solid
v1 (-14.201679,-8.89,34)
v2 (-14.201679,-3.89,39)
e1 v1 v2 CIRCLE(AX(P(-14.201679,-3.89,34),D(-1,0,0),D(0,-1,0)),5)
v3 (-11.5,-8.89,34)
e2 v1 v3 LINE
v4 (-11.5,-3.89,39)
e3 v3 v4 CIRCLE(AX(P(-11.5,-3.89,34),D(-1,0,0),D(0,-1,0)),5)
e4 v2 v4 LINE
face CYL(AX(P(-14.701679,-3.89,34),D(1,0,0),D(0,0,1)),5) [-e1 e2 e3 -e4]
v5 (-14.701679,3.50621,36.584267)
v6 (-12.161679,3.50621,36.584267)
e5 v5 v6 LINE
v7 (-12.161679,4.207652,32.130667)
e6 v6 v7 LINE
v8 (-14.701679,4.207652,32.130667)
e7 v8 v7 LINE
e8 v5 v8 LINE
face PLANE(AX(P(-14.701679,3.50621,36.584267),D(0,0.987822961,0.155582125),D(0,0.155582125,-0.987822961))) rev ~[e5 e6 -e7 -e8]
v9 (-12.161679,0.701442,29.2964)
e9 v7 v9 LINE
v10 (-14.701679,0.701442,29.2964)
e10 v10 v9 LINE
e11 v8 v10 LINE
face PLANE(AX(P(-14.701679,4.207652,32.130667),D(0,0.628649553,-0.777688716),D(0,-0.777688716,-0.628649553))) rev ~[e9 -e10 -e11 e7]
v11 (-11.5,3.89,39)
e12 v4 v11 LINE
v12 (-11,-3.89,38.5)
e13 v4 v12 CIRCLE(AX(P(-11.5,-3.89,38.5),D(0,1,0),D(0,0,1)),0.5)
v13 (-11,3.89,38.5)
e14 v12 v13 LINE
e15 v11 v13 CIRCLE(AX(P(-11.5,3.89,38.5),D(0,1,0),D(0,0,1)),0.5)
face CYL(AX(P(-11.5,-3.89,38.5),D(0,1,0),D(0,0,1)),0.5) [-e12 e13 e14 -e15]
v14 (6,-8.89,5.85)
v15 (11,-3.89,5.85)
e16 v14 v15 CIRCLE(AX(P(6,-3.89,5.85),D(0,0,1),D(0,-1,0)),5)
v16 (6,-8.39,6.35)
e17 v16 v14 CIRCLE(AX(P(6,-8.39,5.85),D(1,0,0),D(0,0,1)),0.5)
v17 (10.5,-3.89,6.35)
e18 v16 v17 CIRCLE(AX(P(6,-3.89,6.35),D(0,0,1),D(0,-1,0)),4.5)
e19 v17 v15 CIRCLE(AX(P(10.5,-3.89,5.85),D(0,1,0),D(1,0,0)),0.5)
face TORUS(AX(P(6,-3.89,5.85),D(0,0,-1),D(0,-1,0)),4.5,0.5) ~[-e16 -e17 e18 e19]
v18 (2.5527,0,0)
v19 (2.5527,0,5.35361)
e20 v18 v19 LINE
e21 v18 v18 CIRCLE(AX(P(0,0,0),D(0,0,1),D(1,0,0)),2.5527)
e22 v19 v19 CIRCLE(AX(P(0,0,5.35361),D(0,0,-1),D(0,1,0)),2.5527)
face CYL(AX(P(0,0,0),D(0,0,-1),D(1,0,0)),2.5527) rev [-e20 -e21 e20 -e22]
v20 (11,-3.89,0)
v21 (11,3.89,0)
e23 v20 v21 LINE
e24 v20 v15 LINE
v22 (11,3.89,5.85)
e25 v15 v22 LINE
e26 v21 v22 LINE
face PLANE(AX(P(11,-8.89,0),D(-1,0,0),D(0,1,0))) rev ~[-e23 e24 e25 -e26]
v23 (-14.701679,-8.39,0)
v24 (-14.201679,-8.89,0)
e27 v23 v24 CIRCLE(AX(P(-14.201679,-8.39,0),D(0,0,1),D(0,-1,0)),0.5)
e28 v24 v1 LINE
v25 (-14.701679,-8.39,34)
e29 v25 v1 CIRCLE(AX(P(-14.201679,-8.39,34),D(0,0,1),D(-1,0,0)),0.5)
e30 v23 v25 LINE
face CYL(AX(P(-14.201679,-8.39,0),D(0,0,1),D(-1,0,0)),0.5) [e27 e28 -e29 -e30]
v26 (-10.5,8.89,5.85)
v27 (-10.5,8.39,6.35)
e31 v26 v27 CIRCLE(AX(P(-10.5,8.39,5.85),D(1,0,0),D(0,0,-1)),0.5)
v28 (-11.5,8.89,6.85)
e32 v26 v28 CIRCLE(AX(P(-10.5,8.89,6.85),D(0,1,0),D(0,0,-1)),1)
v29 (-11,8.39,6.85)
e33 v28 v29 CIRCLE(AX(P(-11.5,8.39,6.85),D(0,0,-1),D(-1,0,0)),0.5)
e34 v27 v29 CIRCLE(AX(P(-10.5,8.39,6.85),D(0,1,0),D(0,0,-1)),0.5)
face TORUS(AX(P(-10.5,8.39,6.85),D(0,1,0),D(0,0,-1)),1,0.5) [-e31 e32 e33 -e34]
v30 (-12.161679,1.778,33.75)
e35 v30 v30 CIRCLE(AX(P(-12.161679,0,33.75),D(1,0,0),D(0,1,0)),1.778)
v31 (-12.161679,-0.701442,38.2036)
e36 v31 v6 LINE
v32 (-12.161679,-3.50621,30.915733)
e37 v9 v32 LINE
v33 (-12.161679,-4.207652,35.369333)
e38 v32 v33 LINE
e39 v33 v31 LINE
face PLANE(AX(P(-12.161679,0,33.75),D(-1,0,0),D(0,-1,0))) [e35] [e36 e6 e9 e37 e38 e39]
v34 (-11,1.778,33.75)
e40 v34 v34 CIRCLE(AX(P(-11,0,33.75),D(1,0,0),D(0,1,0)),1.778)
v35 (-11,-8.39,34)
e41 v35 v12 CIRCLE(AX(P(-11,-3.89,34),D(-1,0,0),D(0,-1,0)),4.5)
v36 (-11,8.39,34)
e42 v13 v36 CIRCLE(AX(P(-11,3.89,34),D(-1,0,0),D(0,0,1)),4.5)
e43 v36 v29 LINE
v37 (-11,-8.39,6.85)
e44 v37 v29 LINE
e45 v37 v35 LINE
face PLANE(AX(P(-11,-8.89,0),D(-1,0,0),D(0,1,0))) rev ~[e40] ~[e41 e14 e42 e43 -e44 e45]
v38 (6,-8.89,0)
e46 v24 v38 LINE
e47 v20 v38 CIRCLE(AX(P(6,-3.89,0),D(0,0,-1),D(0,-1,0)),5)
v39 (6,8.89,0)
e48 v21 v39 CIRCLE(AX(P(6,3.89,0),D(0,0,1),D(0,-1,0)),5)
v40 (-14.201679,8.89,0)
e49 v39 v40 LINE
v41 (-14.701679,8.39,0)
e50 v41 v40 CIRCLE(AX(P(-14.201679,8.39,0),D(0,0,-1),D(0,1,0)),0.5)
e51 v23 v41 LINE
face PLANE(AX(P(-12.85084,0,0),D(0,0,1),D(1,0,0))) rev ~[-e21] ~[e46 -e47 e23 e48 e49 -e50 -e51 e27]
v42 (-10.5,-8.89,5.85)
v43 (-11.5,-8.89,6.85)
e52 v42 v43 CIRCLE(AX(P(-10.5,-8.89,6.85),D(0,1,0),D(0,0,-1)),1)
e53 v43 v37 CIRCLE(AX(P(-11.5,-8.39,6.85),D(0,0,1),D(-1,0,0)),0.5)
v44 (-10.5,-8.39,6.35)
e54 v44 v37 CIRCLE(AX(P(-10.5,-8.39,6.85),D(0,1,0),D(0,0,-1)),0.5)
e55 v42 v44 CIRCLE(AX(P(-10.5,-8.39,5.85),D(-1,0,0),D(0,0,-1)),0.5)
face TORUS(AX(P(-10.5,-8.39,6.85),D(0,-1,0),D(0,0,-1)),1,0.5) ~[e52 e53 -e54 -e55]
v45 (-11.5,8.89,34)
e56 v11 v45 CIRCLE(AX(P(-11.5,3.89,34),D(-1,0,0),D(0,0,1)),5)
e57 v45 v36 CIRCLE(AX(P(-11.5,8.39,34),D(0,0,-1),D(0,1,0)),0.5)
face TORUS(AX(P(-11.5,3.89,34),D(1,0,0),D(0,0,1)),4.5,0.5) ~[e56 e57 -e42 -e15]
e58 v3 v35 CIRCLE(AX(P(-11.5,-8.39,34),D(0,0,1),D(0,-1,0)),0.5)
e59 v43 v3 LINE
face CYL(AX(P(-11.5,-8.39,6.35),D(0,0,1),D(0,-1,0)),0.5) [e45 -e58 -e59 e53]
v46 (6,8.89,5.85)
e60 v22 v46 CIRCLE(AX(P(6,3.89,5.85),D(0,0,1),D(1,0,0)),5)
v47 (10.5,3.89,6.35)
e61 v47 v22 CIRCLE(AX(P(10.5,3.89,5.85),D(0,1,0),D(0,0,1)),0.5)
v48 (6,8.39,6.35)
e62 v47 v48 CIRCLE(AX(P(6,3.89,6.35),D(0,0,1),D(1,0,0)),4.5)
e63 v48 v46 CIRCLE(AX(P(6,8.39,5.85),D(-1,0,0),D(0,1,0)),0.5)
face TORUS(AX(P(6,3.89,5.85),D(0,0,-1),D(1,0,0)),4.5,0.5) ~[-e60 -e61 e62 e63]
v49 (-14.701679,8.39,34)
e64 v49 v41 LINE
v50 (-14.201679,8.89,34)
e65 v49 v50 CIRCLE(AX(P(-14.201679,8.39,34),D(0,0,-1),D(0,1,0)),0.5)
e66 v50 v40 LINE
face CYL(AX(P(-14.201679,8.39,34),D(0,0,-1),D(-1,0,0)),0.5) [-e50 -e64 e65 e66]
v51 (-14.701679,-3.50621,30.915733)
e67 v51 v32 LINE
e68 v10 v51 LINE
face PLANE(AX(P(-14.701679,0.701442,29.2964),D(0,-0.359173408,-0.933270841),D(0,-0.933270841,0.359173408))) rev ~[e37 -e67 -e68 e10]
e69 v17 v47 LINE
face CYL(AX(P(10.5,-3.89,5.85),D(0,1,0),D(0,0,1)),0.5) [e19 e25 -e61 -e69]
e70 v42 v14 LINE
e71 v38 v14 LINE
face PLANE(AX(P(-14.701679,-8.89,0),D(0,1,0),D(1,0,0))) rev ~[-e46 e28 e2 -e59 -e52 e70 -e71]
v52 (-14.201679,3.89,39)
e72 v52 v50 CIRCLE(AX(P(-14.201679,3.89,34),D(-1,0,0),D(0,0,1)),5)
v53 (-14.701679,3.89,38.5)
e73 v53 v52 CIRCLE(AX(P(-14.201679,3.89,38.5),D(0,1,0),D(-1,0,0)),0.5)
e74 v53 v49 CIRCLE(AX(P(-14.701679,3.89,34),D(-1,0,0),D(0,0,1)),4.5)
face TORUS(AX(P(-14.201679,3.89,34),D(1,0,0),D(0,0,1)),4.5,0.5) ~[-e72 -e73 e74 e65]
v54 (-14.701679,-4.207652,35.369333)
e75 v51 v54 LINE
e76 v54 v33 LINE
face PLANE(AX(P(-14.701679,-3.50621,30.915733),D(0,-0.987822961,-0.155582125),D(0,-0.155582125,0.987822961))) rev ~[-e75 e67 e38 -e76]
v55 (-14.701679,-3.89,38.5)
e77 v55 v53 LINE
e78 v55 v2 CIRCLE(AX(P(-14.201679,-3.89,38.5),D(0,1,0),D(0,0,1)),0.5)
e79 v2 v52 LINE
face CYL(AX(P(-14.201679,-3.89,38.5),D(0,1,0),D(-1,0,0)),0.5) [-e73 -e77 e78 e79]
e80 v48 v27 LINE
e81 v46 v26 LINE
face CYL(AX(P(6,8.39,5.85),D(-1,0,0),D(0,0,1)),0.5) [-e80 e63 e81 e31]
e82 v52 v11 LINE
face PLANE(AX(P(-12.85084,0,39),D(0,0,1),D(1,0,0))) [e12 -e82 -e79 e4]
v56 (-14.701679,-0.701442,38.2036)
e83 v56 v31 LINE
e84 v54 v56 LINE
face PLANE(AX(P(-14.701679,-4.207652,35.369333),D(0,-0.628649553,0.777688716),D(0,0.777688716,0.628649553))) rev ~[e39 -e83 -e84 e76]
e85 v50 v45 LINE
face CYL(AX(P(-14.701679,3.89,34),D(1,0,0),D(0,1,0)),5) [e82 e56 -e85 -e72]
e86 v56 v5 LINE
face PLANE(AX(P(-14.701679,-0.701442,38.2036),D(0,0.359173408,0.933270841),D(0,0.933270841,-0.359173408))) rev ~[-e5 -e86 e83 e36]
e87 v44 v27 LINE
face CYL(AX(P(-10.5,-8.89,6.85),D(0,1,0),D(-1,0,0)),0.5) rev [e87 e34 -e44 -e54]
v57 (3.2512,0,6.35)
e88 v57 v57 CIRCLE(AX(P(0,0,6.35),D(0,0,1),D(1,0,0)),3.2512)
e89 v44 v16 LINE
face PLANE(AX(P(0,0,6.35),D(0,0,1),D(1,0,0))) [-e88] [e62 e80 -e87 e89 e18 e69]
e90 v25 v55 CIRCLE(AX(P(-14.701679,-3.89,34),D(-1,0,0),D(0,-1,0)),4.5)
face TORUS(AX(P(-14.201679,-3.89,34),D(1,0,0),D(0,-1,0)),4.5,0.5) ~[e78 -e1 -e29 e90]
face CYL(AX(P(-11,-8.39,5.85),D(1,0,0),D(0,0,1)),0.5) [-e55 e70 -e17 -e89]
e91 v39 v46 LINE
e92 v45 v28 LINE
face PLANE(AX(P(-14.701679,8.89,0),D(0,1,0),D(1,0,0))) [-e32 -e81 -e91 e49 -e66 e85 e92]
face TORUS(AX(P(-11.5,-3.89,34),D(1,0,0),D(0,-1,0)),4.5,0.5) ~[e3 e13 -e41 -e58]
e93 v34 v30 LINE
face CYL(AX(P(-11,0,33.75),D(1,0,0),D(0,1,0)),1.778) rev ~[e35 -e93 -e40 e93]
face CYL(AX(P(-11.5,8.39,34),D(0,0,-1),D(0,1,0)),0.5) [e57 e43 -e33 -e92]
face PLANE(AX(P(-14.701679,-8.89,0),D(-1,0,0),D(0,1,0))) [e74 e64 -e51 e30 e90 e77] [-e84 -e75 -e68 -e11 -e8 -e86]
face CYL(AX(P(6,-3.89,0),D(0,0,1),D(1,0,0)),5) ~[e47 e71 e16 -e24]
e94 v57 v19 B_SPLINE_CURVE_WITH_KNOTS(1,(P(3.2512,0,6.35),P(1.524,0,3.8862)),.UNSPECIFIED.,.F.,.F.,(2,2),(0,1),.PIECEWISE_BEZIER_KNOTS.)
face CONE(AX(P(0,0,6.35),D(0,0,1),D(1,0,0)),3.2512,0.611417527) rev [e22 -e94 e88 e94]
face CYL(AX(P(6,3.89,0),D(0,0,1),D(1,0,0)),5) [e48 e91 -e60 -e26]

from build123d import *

# Parameters (mm, degrees)
F0_W      = 22
F0_H      = 17.78
F1_DEPTH  = 6.35
F2_W      = 3.7016793489
F2_H      = 17.78
F3_DEPTH  = 39
F6_R      = 2.5527
F8_DEPTH  = 25
F4_R      = 3.2512
F7_R      = 1.524
F10_R     = 1.778
F11_DEPTH = 25
F12_R     = 1.778
F13_DEPTH = 2.54
F14_R     = 5
F15_R     = 0.5


with BuildPart() as f1:
    # F0 (on Top) → F1 (new body)
    with BuildSketch(Plane.XY):
        Rectangle(F0_W, F0_H)
    extrude(amount=F1_DEPTH)

    # F2 (on Top) → F3 (join)
    with BuildSketch(Plane.XY):
        with Locations((-12.8508396745, 0)):
            Rectangle(F2_W, F2_H)
    extrude(amount=F3_DEPTH)

    # F6 (on Top) → F8 (cut)
    with BuildSketch(Plane.XY):
        Circle(F6_R)
    extrude(amount=F8_DEPTH, mode=Mode.SUBTRACT)

    # F4 (on face) → F9 section 0
    with BuildSketch(Plane.XY.offset(6.35)):
        Circle(F4_R)
    # F7 (on offset) → F9 section 1
    with BuildSketch(Plane.XY.offset(3.8862)):
        Circle(F7_R)
    loft(mode=Mode.SUBTRACT)

    # F10 (on face) → F11 (cut)
    with BuildSketch(Plane.YZ.offset(-11)):
        with Locations((0, 33.75)):
            Circle(F10_R)
    extrude(amount=-F11_DEPTH, mode=Mode.SUBTRACT)

    # F12 (on face) → F13 (cut)
    with BuildSketch(Plane(origin=(-14.7016793489, 0, 0), x_dir=(0, -1, 0), z_dir=(-1, 0, 0))):
        Polygon((3.5062095774, 30.91573349), (4.2076515874, 35.36933331), (0.7014420101, 38.20359982), (-3.5062095774, 36.58426651), (-4.2076515874, 32.13066669), (-0.7014420101, 29.29640018), align=None)
        with Locations((0, 33.75)):
            Circle(F12_R, mode=Mode.SUBTRACT)
    extrude(amount=-F13_DEPTH, mode=Mode.SUBTRACT)

    # F14
    f14_edges = [f1.edges().sort_by_distance(p)[0] for p in [
        (11, 8.89, 3.175),
        (11, -8.89, 3.175),
        (-12.85084, 8.89, 39),
        (-12.85084, -8.89, 39),
    ]]
    fillet(f14_edges, radius=F14_R)

    # F15
    f15_edges = [f1.edges().sort_by_distance(p)[0] for p in [
        (-11, -8.89, 20.175),
        (-11, 0, 6.35),
        (-14.701679, -8.89, 17),
        (-14.701679, -7.425534, 37.535534),
        (11, 0, 6.35),
        (9.535534, -7.425534, 6.35),
        (9.535534, 7.425534, 6.35),
        (-2.5, -8.89, 6.35),
        (-2.5, 8.89, 6.35),
        (-11, 8.89, 20.175),
        (-14.701679, 8.89, 17),
        (-14.701679, 7.425534, 37.535534),
        (-14.701679, 0, 39),
        (-11, 7.425534, 37.535534),
        (-11, 0, 39),
        (-11, -7.425534, 37.535534),
    ]]
    fillet(f15_edges, radius=F15_R)


solid = f1.part
